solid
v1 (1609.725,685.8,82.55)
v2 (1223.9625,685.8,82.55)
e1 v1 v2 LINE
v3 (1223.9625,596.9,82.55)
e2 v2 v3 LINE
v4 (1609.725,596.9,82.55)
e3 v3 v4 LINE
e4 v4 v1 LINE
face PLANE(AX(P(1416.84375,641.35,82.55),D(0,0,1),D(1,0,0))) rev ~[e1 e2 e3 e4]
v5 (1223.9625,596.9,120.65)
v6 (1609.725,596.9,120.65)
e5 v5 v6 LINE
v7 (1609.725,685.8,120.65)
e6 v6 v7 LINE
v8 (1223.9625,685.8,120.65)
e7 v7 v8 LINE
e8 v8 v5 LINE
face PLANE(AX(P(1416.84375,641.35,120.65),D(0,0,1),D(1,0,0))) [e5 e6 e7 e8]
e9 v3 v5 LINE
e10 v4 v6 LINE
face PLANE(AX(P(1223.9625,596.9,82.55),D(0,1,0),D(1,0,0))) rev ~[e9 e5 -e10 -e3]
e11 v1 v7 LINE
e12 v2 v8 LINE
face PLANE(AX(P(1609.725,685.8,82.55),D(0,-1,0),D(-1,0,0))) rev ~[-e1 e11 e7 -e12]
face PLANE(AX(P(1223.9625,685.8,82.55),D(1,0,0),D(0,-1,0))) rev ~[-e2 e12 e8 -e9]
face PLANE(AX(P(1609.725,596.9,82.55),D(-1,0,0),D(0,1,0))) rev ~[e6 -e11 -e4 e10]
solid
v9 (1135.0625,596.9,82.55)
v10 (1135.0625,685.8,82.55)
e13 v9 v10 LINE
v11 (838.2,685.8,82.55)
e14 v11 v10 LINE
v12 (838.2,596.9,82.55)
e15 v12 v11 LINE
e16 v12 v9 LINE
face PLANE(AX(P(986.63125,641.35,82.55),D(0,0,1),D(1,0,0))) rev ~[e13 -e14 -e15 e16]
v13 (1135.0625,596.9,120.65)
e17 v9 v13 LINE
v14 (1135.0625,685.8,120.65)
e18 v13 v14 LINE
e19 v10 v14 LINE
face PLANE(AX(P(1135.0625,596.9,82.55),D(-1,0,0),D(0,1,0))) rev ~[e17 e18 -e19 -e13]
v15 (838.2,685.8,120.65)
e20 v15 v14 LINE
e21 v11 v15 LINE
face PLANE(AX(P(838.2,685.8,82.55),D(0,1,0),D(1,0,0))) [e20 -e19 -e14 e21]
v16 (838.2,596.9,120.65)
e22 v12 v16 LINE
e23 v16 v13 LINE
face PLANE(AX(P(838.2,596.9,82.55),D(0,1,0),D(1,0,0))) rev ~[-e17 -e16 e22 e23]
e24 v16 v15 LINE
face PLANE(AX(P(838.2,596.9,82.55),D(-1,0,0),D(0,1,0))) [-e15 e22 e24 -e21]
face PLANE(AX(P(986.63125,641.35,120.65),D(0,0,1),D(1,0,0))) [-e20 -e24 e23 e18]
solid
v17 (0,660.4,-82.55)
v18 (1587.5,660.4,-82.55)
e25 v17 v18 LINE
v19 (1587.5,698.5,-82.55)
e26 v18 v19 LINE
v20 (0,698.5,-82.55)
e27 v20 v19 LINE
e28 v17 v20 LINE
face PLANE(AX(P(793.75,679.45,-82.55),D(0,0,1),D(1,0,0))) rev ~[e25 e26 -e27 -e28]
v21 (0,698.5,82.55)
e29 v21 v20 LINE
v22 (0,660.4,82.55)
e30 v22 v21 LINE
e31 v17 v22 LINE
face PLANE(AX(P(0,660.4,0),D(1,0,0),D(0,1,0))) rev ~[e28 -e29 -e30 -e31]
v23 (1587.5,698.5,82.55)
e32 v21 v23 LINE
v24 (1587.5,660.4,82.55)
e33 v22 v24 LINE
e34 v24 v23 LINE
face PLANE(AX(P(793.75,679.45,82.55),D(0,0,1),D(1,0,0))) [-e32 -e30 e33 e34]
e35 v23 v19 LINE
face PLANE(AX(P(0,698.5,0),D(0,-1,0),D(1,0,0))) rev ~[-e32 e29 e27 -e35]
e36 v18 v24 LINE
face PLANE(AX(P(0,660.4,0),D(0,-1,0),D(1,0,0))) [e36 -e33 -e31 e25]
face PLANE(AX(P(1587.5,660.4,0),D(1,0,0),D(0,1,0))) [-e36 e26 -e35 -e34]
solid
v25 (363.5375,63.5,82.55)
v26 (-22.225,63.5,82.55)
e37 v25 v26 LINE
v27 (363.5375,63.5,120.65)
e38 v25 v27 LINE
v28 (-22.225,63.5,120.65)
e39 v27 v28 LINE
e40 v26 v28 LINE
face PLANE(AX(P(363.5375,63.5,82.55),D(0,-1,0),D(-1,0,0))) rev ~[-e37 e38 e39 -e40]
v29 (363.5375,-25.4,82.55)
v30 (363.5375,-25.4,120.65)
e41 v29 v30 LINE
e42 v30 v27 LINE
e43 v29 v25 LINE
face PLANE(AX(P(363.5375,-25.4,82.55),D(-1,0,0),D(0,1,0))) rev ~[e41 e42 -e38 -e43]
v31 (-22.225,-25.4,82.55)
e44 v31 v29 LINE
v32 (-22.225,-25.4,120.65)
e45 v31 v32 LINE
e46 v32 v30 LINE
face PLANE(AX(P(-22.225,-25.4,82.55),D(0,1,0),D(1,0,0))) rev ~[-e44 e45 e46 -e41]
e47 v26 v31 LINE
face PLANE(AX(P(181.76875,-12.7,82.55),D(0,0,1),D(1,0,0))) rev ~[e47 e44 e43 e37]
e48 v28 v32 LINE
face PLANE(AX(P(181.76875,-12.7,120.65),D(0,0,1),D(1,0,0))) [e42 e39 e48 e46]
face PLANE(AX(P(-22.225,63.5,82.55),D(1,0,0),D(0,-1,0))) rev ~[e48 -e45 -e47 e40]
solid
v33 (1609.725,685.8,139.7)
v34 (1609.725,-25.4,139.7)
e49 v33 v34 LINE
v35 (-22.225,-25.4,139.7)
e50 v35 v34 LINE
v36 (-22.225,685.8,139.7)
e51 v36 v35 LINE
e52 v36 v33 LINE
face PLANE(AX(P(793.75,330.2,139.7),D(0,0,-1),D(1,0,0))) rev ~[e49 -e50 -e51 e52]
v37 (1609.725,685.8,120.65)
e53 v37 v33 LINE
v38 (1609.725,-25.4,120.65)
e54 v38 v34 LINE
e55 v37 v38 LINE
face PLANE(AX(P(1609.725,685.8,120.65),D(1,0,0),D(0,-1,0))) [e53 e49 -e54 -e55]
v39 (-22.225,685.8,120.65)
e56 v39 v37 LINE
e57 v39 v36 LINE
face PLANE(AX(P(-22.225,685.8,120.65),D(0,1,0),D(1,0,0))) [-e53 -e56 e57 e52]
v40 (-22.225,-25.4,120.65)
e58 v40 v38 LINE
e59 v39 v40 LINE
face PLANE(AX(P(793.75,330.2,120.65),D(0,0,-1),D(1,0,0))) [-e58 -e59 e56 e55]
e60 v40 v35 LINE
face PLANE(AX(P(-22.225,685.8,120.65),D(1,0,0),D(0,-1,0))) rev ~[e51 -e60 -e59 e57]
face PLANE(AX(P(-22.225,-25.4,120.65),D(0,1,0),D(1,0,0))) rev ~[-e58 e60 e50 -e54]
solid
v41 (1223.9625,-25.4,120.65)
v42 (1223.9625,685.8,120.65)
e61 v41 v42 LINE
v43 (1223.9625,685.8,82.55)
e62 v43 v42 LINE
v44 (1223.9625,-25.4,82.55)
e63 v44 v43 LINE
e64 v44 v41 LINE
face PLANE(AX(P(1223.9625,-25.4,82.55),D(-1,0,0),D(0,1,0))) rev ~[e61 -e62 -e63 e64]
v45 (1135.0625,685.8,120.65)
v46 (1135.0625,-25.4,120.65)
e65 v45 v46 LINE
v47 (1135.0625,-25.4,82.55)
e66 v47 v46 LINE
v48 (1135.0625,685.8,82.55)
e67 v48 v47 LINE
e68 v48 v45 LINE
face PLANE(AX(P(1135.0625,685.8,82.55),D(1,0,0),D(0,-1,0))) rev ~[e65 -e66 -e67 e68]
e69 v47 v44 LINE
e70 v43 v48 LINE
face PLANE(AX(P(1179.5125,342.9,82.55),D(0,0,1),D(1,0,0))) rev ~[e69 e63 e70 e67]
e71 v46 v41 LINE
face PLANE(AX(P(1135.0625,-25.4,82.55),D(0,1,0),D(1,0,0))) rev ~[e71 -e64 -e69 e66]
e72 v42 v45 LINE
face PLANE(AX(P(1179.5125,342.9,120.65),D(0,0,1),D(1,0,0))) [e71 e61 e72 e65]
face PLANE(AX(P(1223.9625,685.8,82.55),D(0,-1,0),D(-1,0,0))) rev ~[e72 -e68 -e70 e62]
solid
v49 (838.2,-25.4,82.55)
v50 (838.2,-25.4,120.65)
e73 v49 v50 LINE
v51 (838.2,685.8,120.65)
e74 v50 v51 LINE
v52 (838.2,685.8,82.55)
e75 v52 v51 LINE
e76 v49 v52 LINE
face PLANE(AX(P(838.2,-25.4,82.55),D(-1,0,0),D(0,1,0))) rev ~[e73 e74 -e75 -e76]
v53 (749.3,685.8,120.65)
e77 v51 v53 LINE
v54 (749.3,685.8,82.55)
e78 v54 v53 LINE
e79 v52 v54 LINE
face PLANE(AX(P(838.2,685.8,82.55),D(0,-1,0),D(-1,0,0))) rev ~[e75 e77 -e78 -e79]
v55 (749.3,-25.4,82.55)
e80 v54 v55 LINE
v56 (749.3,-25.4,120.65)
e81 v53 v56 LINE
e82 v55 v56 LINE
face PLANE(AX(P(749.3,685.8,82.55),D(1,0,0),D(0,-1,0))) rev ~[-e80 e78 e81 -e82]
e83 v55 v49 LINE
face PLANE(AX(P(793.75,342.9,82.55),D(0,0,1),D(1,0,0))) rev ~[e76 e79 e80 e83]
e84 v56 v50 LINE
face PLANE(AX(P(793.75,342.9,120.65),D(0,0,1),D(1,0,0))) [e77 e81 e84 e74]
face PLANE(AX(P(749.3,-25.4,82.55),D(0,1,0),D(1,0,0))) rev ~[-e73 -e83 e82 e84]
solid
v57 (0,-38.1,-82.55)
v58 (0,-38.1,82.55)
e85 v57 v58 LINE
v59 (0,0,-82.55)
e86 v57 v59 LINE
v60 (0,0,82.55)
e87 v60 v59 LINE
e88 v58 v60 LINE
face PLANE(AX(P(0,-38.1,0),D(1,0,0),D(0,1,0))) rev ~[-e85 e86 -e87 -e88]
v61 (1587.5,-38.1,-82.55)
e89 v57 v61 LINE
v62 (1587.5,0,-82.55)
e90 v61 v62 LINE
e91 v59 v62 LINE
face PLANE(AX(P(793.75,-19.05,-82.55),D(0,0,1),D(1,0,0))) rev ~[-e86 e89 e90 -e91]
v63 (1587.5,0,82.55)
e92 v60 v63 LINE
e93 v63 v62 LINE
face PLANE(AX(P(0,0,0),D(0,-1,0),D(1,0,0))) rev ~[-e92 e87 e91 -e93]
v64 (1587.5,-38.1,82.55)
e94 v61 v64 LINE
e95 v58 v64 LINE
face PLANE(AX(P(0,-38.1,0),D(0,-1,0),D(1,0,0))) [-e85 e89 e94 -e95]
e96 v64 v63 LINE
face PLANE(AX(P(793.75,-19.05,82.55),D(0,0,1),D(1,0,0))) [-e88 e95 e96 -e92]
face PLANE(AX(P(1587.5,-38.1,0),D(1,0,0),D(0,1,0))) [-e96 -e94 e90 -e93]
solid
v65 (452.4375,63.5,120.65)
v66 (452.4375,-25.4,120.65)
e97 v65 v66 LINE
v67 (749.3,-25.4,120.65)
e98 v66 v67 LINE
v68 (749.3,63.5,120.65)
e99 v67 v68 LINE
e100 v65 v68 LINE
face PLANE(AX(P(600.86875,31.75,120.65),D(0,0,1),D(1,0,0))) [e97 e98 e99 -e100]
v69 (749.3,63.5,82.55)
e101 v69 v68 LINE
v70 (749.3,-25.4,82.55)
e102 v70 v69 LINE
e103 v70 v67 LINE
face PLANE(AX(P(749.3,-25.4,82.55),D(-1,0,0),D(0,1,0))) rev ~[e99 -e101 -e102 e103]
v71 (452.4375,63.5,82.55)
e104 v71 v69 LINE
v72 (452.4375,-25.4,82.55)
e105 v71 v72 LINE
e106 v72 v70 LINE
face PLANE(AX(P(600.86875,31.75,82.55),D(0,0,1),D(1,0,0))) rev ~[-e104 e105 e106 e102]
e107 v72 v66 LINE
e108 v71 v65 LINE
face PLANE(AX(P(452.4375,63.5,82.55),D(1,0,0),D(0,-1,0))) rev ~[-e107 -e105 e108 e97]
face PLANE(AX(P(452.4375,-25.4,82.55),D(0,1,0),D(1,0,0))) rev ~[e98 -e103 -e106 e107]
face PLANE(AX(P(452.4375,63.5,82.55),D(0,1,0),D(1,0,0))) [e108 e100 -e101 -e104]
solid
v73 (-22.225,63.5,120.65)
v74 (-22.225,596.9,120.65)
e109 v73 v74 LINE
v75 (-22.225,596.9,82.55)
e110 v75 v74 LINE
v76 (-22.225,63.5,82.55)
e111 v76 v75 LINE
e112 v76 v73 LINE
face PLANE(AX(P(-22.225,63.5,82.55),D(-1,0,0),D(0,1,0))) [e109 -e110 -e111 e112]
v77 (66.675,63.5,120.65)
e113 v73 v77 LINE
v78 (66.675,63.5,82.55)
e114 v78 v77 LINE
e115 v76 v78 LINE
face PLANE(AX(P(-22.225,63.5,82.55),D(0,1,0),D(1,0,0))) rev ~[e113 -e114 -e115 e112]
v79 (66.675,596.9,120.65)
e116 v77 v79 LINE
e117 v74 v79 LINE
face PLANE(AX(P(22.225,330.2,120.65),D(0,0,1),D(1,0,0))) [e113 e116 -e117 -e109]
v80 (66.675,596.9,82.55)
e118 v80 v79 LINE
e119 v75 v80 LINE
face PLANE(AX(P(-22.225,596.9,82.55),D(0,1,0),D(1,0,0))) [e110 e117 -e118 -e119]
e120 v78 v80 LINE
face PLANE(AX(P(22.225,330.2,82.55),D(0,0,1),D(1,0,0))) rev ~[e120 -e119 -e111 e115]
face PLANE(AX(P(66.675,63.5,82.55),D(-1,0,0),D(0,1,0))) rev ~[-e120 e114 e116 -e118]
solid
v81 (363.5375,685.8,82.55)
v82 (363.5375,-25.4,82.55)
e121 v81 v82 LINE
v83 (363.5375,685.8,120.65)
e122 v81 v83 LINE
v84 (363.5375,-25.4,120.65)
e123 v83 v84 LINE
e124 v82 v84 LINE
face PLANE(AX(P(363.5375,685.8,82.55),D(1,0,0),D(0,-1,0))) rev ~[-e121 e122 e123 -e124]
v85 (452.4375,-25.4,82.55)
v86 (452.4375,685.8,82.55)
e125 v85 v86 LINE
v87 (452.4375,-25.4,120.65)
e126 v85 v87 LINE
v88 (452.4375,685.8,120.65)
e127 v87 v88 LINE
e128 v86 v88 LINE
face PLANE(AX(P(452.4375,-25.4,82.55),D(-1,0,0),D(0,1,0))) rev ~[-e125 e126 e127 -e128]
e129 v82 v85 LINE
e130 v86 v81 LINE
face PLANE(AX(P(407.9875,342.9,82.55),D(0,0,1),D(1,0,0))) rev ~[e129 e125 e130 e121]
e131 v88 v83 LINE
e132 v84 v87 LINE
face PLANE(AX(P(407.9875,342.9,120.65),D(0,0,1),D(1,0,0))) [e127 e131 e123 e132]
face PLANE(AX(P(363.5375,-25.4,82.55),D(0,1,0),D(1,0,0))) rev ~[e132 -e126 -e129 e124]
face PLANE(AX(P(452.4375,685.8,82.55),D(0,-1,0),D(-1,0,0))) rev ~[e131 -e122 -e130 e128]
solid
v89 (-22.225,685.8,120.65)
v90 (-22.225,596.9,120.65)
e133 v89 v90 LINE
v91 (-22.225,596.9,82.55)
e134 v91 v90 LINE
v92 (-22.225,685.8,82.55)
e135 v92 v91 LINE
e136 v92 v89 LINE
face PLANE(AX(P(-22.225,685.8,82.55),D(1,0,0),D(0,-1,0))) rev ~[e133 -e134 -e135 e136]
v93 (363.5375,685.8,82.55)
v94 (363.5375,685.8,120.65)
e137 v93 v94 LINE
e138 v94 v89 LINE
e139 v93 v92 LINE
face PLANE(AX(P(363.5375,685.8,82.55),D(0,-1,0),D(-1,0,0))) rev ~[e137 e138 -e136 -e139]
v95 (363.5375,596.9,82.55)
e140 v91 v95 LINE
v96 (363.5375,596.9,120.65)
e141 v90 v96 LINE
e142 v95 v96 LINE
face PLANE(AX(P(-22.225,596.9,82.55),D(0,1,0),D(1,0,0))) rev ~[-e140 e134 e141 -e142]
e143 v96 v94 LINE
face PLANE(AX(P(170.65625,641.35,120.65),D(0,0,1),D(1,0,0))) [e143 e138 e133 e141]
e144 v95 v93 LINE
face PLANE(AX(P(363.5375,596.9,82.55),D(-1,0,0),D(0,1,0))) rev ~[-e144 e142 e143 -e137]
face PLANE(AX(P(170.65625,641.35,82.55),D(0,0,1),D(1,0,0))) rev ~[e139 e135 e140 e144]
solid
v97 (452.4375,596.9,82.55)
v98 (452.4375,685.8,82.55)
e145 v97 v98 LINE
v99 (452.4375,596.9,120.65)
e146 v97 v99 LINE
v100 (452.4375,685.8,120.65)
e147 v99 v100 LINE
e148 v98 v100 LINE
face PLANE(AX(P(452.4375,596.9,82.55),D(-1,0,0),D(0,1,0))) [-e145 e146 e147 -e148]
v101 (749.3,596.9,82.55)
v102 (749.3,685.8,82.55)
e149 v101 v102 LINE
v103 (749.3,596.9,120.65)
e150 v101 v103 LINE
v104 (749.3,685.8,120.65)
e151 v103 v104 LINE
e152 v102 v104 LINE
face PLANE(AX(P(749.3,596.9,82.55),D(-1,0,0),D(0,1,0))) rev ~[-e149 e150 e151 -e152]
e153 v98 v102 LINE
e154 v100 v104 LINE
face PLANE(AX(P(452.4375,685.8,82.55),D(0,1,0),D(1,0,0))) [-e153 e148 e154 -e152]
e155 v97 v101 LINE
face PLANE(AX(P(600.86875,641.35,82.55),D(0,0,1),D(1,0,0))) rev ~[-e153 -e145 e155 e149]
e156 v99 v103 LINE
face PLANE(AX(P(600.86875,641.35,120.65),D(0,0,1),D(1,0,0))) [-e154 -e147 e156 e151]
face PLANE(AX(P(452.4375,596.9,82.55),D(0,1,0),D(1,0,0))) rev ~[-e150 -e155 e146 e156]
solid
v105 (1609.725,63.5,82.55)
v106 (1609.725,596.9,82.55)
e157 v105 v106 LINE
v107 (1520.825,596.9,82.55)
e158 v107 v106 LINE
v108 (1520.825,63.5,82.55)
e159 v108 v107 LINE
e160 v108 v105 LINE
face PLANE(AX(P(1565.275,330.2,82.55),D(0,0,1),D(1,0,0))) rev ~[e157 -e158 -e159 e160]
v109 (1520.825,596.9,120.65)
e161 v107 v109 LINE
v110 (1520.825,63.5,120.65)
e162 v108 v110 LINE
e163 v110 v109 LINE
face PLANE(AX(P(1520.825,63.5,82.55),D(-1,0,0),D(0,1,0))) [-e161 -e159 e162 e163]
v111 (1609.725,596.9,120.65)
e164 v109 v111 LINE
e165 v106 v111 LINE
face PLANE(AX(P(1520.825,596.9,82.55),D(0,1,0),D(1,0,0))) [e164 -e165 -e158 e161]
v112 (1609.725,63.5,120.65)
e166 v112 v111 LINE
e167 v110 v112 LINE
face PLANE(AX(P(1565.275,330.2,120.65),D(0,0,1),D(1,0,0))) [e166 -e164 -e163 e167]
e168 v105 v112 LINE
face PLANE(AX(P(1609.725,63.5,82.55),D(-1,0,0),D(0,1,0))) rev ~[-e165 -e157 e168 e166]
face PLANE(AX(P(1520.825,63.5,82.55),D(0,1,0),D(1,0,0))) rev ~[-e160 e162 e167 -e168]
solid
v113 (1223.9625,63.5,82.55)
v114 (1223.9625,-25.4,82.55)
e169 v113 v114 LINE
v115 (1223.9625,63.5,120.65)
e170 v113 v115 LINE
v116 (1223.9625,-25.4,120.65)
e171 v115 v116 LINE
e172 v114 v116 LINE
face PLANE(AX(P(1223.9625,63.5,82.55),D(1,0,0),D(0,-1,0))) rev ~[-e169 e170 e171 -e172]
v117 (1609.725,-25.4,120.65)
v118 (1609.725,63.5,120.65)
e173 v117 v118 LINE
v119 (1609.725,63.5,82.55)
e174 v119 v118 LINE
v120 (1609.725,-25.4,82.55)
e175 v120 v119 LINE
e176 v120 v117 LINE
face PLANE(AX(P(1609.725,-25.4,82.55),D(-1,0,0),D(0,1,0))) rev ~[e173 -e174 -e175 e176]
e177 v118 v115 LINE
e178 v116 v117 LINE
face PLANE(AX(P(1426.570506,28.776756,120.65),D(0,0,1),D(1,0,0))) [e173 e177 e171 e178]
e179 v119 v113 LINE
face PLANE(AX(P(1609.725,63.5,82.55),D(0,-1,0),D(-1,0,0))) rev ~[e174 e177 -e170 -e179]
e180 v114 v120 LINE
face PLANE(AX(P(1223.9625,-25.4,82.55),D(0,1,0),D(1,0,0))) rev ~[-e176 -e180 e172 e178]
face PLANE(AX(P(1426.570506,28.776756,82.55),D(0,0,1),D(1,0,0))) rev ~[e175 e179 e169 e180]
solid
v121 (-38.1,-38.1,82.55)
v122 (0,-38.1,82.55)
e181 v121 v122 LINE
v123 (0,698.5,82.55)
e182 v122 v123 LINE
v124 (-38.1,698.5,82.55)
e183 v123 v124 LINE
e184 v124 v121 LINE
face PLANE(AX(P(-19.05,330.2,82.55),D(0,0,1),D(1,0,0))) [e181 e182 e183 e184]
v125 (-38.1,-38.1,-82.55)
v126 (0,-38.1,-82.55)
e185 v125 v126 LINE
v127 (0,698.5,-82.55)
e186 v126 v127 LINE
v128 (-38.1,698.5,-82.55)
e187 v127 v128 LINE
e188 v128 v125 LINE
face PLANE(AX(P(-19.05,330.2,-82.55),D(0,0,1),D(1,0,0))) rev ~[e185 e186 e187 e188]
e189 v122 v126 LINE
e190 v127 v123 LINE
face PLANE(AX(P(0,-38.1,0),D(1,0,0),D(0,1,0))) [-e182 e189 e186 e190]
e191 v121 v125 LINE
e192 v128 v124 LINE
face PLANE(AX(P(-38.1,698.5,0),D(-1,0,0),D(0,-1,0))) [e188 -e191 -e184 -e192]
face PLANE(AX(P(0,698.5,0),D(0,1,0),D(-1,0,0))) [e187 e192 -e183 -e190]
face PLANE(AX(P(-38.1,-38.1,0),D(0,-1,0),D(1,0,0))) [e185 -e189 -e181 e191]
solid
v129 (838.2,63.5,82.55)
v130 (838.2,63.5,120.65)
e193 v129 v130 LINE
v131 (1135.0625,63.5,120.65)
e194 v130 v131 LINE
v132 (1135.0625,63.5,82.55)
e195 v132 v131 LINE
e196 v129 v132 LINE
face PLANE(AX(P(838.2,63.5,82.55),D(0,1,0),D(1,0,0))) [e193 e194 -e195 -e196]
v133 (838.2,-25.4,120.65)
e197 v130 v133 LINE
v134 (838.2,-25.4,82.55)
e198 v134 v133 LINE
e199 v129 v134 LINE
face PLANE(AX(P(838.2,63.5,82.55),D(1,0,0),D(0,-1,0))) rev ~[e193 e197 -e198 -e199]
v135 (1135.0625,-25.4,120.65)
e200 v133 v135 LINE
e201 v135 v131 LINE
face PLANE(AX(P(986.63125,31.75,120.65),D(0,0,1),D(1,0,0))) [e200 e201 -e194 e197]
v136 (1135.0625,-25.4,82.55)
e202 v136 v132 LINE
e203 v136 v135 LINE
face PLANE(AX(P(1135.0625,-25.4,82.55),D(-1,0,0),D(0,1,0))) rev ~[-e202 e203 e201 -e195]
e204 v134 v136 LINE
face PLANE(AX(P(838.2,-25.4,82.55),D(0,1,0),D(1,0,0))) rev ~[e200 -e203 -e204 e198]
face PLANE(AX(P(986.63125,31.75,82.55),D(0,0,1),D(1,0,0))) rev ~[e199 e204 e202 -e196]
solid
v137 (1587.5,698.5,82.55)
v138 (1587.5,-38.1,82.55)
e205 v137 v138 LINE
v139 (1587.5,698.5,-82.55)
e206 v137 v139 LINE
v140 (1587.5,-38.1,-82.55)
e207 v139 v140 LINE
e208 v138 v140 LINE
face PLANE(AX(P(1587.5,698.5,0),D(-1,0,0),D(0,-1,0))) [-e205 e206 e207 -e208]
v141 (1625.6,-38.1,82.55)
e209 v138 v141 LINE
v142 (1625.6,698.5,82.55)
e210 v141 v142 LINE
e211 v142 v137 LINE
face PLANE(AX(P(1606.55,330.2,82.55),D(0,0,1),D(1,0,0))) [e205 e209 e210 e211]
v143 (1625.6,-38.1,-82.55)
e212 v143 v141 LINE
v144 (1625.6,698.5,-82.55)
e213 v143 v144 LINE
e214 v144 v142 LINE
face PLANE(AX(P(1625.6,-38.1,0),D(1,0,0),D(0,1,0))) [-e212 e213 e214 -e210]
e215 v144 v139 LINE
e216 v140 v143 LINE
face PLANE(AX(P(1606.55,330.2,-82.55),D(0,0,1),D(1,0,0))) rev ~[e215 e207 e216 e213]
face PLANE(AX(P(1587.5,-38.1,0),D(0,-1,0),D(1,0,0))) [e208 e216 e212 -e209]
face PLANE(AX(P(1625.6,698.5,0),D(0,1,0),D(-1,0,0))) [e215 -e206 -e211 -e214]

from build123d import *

# Parameters (mm, degrees)
F1_DEPTH  = 82.55
F0_W      = 1587.5
F0_H      = 38.1
F2_DEPTH  = 82.55
F3_DEPTH  = 82.55
F4_DEPTH  = 82.55
F5_W      = 88.9
F5_H      = 533.4
F6_DEPTH  = 38.1
F5_H_2    = 25.4
F7_DEPTH  = 38.1
F8_DEPTH  = 38.1
F9_DEPTH  = 38.1
F10_DEPTH = 38.1
F11_DEPTH = 38.1
F5_W_2    = 296.8625
F5_H_3    = 88.9
F5_W_3    = 363.5375
F12_DEPTH = 38.1
F5_H_4    = 63.5
F15_W     = 1631.95
F15_H     = 711.2
F16_DEPTH = 19.05


# Not quite as in the source:
# - a feature names something its author has since deleted; it is built from what else it names


with BuildPart() as f1:
    # F0 (on Top) → F1 (new body, symmetric)
    with BuildSketch(Plane.XY):
        Polygon((0, -38.1), (0, 0), (0, 660.4), (0, 698.5), (-38.1, 698.5), (-38.1, -38.1), align=None)
    extrude(amount=F1_DEPTH, both=True)


with BuildPart() as f2:
    # F0 (on Top) → F2 (new body, symmetric)
    with BuildSketch(Plane.XY):
        with Locations((793.75, 679.45)):
            Rectangle(F0_W, F0_H)
    extrude(amount=F2_DEPTH, both=True)


with BuildPart() as f3:
    # F0 (on Top) → F3 (new body, symmetric)
    with BuildSketch(Plane.XY):
        with Locations((793.75, -19.05)):
            Rectangle(F0_W, F0_H)
    extrude(amount=F3_DEPTH, both=True)


with BuildPart() as f4:
    # F0 (on Top) → F4 (new body, symmetric)
    with BuildSketch(Plane.XY):
        Polygon((1587.5, 660.4), (1587.5, 0), (1587.5, -38.1), (1625.6, -38.1), (1625.6, 698.5), (1587.5, 698.5), align=None)
    extrude(amount=F4_DEPTH, both=True)


with BuildPart() as f6:
    # F5 (on face) → F6 (new body)
    with BuildSketch(Plane.XY.offset(82.55)):
        with Locations((22.225, 330.2)):
            Rectangle(F5_W, F5_H)
    extrude(amount=F6_DEPTH)


with BuildPart() as f7:
    # F5 (on face) → F7 (new body)
    with BuildSketch(Plane.XY.offset(82.55)):
        Polygon((363.5375, 596.9), (363.5375, 63.5), (363.5375, 0), (452.4375, 0), (452.4375, 63.5), (452.4375, 596.9), (452.4375, 685.8), (363.5375, 685.8), align=None)
        with Locations((407.9875, -12.7)):
            Rectangle(F5_W, F5_H_2)
    extrude(amount=F7_DEPTH)


with BuildPart() as f8:
    # F5 (on face) → F8 (new body)
    with BuildSketch(Plane.XY.offset(82.55)):
        Polygon((749.3, 63.5), (749.3, 0), (838.2, 0), (838.2, 63.5), (838.2, 596.9), (838.2, 685.8), (749.3, 685.8), (749.3, 596.9), align=None)
        with Locations((793.75, -12.7)):
            Rectangle(F5_W, F5_H_2)
    extrude(amount=F8_DEPTH)


with BuildPart() as f9:
    # F5 (on face) → F9 (new body)
    with BuildSketch(Plane.XY.offset(82.55)):
        Polygon((1135.0625, 0), (1223.9625, 0), (1223.9625, 63.5), (1223.9625, 596.9), (1223.9625, 685.8), (1135.0625, 685.8), (1135.0625, 596.9), (1135.0625, 63.5), align=None)
        with Locations((1179.5125, -12.7)):
            Rectangle(F5_W, F5_H_2)
    extrude(amount=F9_DEPTH)


with BuildPart() as f10:
    # F5 (on face) → F10 (new body)
    with BuildSketch(Plane.XY.offset(82.55)):
        with Locations((1565.275, 330.2)):
            Rectangle(F5_W, F5_H)
    extrude(amount=F10_DEPTH)


with BuildPart() as f11:
    # F5 (on face) → F11 (new body)
    with BuildSketch(Plane.XY.offset(82.55)):
        Polygon((-22.225, 685.8), (-22.225, 596.9), (66.675, 596.9), (363.5375, 596.9), (363.5375, 685.8), align=None)
    extrude(amount=F11_DEPTH)


with BuildPart() as f11b:
    # F5 (on face) → F11, piece 2 (new body)
    with BuildSketch(Plane.XY.offset(82.55)):
        with Locations((600.86875, 641.35)):
            Rectangle(F5_W_2, F5_H_3)
    extrude(amount=F11_DEPTH)


with BuildPart() as f11c:
    # F5 (on face) → F11, piece 3 (new body)
    with BuildSketch(Plane.XY.offset(82.55)):
        with Locations((986.63125, 641.35)):
            Rectangle(F5_W_2, F5_H_3)
    extrude(amount=F11_DEPTH)


with BuildPart() as f11d:
    # F5 (on face) → F11, piece 4 (new body)
    with BuildSketch(Plane.XY.offset(82.55)):
        Polygon((1520.825, 596.9), (1609.725, 596.9), (1609.725, 685.8), (1223.9625, 685.8), (1223.9625, 596.9), align=None)
    extrude(amount=F11_DEPTH)


with BuildPart() as f12:
    # F5 (on face) → F12 (new body)
    with BuildSketch(Plane.XY.offset(82.55)):
        with Locations((181.76875, -12.7)):
            Rectangle(F5_W_3, F5_H_2)
        Polygon((-22.225, 63.5), (-22.225, -25.4), (0, -25.4), (0, 0), (363.5375, 0), (363.5375, 63.5), (66.675, 63.5), align=None)
    extrude(amount=F12_DEPTH)


with BuildPart() as f12b:
    # F5 (on face) → F12, piece 2 (new body)
    with BuildSketch(Plane.XY.offset(82.55)):
        with Locations((600.86875, 31.75)):
            Rectangle(F5_W_2, F5_H_4)
        with Locations((600.86875, -12.7)):
            Rectangle(F5_W_2, F5_H_2)
    extrude(amount=F12_DEPTH)


with BuildPart() as f12c:
    # F5 (on face) → F12, piece 3 (new body)
    with BuildSketch(Plane.XY.offset(82.55)):
        with Locations((986.63125, 31.75)):
            Rectangle(F5_W_2, F5_H_4)
        with Locations((986.63125, -12.7)):
            Rectangle(F5_W_2, F5_H_2)
    extrude(amount=F12_DEPTH)


with BuildPart() as f12d:
    # F5 (on face) → F12, piece 4 (new body)
    with BuildSketch(Plane.XY.offset(82.55)):
        Polygon((1587.5, 0), (1587.5, -25.4), (1609.725, -25.4), (1609.725, 63.5), (1520.825, 63.5), (1223.9625, 63.5), (1223.9625, 0), align=None)
        with Locations((1405.73125, -12.7)):
            Rectangle(F5_W_3, F5_H_2)
    extrude(amount=F12_DEPTH)


with BuildPart() as f16:
    # F15 (on 3pt) → F16 (new body)
    with BuildSketch(Plane(origin=(0, 0, 120.65), x_dir=(1, 0, 0), z_dir=(0, 0, -1))):
        with Locations((793.75, -330.2)):
            Rectangle(F15_W, F15_H)
    extrude(amount=-F16_DEPTH)


solid = Compound([f1.part, f2.part, f3.part, f4.part, f6.part, f7.part, f8.part, f9.part, f10.part, f11.part, f11b.part, f11c.part, f11d.part, f12.part, f12b.part, f12c.part, f12d.part, f16.part])
